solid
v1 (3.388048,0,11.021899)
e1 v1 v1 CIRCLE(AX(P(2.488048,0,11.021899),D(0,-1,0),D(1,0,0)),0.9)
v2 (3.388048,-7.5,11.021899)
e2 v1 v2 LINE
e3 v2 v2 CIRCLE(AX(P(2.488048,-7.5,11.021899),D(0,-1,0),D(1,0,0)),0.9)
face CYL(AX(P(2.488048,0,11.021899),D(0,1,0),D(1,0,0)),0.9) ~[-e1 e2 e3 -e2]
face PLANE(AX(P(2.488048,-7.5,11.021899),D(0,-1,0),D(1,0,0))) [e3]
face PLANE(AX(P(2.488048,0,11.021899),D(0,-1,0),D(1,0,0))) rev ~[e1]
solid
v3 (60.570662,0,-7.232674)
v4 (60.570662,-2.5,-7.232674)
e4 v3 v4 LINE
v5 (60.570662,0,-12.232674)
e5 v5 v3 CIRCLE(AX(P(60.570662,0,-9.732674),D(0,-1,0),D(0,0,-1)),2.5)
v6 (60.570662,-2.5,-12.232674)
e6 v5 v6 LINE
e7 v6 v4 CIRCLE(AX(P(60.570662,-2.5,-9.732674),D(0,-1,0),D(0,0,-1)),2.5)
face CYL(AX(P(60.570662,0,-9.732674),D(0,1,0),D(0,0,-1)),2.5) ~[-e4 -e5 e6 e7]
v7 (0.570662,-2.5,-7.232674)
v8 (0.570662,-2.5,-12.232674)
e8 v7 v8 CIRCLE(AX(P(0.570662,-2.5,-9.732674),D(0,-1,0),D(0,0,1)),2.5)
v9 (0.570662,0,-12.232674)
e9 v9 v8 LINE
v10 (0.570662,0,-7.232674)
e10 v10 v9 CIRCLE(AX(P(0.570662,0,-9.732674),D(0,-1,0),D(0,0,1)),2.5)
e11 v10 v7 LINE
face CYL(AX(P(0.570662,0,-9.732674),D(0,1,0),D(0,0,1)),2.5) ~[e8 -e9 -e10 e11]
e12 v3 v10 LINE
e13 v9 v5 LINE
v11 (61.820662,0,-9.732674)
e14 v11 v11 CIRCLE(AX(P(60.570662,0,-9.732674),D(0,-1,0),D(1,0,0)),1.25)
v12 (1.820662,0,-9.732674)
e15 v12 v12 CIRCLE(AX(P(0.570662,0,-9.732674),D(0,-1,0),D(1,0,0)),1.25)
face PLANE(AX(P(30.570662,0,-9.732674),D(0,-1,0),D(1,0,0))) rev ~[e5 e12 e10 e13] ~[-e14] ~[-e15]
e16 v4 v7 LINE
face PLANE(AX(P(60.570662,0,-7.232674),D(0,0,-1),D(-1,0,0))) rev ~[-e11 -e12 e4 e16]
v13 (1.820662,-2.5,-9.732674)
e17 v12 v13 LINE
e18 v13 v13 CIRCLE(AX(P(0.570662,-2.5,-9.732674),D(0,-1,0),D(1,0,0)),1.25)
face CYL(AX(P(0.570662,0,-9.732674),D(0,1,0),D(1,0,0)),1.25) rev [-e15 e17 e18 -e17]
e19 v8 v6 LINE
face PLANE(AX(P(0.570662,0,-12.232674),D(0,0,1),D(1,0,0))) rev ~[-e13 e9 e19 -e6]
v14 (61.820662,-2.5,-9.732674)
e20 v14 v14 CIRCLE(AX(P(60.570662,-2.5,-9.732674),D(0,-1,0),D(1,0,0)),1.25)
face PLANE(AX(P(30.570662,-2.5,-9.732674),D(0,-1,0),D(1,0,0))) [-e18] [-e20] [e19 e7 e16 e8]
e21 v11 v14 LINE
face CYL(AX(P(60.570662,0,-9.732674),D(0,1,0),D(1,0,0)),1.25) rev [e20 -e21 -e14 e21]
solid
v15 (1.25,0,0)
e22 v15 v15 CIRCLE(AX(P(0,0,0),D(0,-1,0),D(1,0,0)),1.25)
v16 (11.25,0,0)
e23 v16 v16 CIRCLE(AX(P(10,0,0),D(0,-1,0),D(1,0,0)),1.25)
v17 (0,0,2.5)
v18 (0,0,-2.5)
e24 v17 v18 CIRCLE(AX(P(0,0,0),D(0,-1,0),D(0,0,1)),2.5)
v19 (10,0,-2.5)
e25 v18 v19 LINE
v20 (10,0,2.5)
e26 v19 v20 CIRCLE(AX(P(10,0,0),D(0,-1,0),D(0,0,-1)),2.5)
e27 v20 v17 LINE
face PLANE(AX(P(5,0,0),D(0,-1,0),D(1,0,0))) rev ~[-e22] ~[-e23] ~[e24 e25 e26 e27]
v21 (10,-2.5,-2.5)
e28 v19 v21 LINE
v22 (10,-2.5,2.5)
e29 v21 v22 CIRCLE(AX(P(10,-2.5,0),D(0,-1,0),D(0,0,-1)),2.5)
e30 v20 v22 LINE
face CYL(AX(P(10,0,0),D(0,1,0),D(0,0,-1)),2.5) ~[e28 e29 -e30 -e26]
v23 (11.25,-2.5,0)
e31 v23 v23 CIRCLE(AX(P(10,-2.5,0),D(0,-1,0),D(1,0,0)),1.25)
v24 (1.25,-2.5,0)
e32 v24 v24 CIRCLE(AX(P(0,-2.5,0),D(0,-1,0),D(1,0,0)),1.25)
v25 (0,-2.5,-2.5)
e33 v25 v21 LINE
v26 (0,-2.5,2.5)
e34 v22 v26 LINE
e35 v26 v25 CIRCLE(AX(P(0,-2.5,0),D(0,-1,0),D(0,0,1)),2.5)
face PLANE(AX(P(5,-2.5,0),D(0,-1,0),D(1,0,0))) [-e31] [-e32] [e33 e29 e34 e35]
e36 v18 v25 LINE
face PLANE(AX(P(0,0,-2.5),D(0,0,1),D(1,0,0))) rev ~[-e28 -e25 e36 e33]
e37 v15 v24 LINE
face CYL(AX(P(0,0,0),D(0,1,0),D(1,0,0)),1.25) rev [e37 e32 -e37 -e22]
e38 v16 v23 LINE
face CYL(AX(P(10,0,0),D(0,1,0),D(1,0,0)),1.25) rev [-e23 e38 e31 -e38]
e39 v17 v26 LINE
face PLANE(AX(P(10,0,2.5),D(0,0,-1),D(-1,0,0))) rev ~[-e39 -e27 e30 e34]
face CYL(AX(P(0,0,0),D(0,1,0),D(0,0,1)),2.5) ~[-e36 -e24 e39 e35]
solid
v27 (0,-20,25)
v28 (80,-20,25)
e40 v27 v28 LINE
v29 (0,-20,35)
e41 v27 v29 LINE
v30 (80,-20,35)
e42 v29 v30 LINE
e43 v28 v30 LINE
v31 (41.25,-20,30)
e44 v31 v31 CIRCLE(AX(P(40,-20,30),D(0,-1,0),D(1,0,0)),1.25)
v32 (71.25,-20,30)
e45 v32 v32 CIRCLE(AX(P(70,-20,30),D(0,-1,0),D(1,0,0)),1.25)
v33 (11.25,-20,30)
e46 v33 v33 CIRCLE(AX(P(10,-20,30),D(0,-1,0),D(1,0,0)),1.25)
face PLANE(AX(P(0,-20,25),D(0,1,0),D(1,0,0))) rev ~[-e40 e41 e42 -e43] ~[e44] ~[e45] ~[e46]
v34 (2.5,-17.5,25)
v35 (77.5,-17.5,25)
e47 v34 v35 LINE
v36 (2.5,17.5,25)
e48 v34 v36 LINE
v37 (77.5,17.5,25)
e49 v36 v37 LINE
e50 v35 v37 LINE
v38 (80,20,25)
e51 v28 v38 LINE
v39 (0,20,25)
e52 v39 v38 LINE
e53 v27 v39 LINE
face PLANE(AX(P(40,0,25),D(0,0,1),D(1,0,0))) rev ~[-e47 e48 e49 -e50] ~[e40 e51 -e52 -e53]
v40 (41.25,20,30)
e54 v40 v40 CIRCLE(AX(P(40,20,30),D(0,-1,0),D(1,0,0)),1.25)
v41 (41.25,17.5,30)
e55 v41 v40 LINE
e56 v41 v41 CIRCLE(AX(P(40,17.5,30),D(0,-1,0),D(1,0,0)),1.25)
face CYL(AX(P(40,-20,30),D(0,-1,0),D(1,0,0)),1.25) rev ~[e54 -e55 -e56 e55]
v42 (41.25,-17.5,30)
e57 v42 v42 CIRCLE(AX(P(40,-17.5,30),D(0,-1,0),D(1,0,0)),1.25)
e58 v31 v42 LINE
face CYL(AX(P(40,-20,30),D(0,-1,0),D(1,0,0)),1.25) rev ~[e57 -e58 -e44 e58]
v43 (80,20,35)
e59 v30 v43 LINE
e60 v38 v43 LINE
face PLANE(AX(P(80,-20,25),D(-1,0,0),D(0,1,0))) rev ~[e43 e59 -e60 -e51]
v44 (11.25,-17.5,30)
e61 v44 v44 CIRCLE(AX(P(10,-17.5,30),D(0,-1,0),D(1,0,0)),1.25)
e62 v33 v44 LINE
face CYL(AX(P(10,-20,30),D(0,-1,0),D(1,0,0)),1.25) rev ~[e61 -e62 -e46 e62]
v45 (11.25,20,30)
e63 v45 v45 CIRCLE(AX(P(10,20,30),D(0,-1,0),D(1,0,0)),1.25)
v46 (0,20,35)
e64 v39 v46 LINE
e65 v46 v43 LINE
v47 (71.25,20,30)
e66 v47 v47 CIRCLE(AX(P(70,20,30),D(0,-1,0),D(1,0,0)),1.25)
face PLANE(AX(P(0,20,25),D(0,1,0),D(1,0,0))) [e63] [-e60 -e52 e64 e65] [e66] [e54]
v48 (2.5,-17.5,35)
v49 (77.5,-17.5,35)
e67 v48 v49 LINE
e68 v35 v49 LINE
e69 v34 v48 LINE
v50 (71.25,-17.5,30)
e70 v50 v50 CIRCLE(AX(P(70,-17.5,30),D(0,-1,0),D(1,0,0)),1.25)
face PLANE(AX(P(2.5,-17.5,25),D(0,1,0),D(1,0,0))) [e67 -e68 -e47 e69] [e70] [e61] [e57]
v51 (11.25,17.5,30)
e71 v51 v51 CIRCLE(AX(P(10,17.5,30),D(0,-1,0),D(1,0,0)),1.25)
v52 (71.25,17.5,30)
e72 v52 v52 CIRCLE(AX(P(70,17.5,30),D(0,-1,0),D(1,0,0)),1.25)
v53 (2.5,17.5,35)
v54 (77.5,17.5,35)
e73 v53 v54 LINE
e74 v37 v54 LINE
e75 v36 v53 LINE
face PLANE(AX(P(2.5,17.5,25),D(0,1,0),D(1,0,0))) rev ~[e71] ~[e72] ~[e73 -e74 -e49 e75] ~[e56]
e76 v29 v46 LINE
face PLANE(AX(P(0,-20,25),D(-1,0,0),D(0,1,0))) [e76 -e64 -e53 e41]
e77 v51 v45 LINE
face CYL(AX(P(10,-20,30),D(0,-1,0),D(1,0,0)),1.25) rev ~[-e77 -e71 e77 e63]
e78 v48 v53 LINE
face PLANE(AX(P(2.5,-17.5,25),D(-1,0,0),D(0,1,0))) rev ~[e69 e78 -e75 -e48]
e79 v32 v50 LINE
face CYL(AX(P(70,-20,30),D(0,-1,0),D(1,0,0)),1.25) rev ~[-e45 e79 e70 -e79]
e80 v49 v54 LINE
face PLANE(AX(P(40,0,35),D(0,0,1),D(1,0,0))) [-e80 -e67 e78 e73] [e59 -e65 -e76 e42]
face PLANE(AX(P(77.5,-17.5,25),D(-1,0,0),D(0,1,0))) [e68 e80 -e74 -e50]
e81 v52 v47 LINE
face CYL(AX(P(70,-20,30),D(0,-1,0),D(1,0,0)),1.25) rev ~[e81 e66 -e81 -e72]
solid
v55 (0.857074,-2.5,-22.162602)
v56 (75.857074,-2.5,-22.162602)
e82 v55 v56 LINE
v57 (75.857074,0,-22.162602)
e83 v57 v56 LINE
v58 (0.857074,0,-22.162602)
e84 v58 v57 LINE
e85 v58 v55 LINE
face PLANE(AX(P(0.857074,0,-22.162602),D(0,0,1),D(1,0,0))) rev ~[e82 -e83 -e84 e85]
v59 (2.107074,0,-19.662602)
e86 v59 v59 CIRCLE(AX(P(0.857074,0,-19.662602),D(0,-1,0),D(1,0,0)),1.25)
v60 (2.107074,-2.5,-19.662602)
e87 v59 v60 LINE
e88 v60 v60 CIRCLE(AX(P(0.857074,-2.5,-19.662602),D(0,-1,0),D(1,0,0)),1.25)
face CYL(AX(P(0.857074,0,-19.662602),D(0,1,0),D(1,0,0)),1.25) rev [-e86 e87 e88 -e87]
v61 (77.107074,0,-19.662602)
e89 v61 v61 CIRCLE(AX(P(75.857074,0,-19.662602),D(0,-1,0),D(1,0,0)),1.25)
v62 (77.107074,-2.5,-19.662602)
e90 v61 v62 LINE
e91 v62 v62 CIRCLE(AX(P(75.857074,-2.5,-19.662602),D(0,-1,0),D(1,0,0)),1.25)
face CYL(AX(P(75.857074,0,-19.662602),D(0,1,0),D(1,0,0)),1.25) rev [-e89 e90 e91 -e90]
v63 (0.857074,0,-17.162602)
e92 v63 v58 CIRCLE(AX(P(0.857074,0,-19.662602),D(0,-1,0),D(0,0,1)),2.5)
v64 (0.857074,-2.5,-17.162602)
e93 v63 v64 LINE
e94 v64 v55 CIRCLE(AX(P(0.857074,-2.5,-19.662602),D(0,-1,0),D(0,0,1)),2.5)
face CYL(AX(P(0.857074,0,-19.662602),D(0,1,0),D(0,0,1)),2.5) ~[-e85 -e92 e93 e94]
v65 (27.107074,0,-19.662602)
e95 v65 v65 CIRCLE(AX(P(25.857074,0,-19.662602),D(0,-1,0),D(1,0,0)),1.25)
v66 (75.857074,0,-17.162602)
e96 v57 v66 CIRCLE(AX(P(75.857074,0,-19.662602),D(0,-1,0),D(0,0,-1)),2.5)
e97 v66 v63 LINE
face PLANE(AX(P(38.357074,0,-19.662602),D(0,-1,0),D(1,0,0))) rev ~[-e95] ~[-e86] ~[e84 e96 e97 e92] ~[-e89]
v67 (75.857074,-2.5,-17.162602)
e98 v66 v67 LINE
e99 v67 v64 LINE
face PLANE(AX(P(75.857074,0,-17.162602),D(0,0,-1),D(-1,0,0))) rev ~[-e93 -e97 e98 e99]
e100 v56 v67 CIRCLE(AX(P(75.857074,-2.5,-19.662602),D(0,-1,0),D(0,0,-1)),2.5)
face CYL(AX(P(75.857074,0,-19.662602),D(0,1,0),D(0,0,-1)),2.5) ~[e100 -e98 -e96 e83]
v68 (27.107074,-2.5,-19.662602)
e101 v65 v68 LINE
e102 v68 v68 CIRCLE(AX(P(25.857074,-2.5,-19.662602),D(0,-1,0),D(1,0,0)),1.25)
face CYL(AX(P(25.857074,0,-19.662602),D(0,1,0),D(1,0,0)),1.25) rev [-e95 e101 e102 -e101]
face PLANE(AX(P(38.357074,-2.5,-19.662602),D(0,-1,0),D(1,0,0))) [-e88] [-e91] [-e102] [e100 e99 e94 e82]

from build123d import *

# Parameters (mm, degrees)
F1_R      = 1.25
F2_DEPTH  = 2.5
F3_R      = 1.25
F4_DEPTH  = 2.5
F5_R      = 1.25
F6_DEPTH  = 2.5
F8_W      = 80
F8_H      = 40
F8_W_2    = 75
F8_H_2    = 35
F9_DEPTH  = 10
F10_R     = 1.25
F11_DEPTH = 40.001
F12_R     = 0.9
F13_DEPTH = 7.5


with BuildPart() as f2:
    # F1 (on Front) → F2 (new body)
    with BuildSketch(Plane.XZ):
        with BuildLine():
            Line((10, 2.5), (0, 2.5))
            ThreePointArc((0, 2.5), (-2.5, 0), (0, -2.5))
            Line((0, -2.5), (10, -2.5))
            ThreePointArc((10, -2.5), (12.5, 0), (10, 2.5))
        make_face()
        Circle(F1_R, mode=Mode.SUBTRACT)
        with Locations((10, 0)):
            Circle(F1_R, mode=Mode.SUBTRACT)
    extrude(amount=F2_DEPTH)


with BuildPart() as f4:
    # F3 (on Front) → F4 (new body)
    with BuildSketch(Plane.XZ):
        with BuildLine():
            Line((60.5706622079, -7.232673876), (0.5706622079, -7.232673876))
            ThreePointArc((0.5706622079, -7.232673876), (-1.9293377921, -9.732673876), (0.5706622079, -12.232673876))
            Line((0.5706622079, -12.232673876), (60.5706622079, -12.232673876))
            ThreePointArc((60.5706622079, -12.232673876), (63.0706622079, -9.732673876), (60.5706622079, -7.232673876))
        make_face()
        with Locations((0.5706622079, -9.732673876)):
            Circle(F3_R, mode=Mode.SUBTRACT)
        with Locations((60.5706622079, -9.732673876)):
            Circle(F3_R, mode=Mode.SUBTRACT)
    extrude(amount=F4_DEPTH)


with BuildPart() as f6:
    # F5 (on Front) → F6 (new body)
    with BuildSketch(Plane.XZ):
        with BuildLine():
            Line((75.8570737601, -17.1626018733), (0.8570737601, -17.1626018733))
            ThreePointArc((0.8570737601, -17.1626018733), (-1.6429262399, -19.6626018733), (0.8570737601, -22.1626018733))
            Line((0.8570737601, -22.1626018733), (75.8570737601, -22.1626018733))
            ThreePointArc((75.8570737601, -22.1626018733), (78.3570737601, -19.6626018733), (75.8570737601, -17.1626018733))
        make_face()
        with Locations((0.8570737601, -19.6626018733)):
            Circle(F5_R, mode=Mode.SUBTRACT)
        with Locations((25.8570737601, -19.6626018733)):
            Circle(F5_R, mode=Mode.SUBTRACT)
        with Locations((75.8570737601, -19.6626018733)):
            Circle(F5_R, mode=Mode.SUBTRACT)
    extrude(amount=F6_DEPTH)


with BuildPart() as f9:
    # F8 (on offset) → F9 (new body)
    with BuildSketch(Plane.XY.offset(25)):
        with Locations((40, 0)):
            Rectangle(F8_W, F8_H)
        with Locations((40, 0)):
            Rectangle(F8_W_2, F8_H_2, mode=Mode.SUBTRACT)
    extrude(amount=F9_DEPTH)

    # F10 (on face) → F11 (cut, through all)
    with BuildSketch(Plane.XZ.offset(20)):
        with Locations((10, 30)):
            Circle(F10_R)
        with Locations((70, 30)):
            Circle(F10_R)
        with Locations((40, 30)):
            Circle(F10_R)
    extrude(amount=-F11_DEPTH, mode=Mode.SUBTRACT)


with BuildPart() as f13:
    # F12 (on Front) → F13 (new body)
    with BuildSketch(Plane.XZ):
        with Locations((2.488047583, 11.0218990594)):
            Circle(F12_R)
    extrude(amount=F13_DEPTH)


solid = Compound([f2.part, f4.part, f6.part, f9.part, f13.part])
